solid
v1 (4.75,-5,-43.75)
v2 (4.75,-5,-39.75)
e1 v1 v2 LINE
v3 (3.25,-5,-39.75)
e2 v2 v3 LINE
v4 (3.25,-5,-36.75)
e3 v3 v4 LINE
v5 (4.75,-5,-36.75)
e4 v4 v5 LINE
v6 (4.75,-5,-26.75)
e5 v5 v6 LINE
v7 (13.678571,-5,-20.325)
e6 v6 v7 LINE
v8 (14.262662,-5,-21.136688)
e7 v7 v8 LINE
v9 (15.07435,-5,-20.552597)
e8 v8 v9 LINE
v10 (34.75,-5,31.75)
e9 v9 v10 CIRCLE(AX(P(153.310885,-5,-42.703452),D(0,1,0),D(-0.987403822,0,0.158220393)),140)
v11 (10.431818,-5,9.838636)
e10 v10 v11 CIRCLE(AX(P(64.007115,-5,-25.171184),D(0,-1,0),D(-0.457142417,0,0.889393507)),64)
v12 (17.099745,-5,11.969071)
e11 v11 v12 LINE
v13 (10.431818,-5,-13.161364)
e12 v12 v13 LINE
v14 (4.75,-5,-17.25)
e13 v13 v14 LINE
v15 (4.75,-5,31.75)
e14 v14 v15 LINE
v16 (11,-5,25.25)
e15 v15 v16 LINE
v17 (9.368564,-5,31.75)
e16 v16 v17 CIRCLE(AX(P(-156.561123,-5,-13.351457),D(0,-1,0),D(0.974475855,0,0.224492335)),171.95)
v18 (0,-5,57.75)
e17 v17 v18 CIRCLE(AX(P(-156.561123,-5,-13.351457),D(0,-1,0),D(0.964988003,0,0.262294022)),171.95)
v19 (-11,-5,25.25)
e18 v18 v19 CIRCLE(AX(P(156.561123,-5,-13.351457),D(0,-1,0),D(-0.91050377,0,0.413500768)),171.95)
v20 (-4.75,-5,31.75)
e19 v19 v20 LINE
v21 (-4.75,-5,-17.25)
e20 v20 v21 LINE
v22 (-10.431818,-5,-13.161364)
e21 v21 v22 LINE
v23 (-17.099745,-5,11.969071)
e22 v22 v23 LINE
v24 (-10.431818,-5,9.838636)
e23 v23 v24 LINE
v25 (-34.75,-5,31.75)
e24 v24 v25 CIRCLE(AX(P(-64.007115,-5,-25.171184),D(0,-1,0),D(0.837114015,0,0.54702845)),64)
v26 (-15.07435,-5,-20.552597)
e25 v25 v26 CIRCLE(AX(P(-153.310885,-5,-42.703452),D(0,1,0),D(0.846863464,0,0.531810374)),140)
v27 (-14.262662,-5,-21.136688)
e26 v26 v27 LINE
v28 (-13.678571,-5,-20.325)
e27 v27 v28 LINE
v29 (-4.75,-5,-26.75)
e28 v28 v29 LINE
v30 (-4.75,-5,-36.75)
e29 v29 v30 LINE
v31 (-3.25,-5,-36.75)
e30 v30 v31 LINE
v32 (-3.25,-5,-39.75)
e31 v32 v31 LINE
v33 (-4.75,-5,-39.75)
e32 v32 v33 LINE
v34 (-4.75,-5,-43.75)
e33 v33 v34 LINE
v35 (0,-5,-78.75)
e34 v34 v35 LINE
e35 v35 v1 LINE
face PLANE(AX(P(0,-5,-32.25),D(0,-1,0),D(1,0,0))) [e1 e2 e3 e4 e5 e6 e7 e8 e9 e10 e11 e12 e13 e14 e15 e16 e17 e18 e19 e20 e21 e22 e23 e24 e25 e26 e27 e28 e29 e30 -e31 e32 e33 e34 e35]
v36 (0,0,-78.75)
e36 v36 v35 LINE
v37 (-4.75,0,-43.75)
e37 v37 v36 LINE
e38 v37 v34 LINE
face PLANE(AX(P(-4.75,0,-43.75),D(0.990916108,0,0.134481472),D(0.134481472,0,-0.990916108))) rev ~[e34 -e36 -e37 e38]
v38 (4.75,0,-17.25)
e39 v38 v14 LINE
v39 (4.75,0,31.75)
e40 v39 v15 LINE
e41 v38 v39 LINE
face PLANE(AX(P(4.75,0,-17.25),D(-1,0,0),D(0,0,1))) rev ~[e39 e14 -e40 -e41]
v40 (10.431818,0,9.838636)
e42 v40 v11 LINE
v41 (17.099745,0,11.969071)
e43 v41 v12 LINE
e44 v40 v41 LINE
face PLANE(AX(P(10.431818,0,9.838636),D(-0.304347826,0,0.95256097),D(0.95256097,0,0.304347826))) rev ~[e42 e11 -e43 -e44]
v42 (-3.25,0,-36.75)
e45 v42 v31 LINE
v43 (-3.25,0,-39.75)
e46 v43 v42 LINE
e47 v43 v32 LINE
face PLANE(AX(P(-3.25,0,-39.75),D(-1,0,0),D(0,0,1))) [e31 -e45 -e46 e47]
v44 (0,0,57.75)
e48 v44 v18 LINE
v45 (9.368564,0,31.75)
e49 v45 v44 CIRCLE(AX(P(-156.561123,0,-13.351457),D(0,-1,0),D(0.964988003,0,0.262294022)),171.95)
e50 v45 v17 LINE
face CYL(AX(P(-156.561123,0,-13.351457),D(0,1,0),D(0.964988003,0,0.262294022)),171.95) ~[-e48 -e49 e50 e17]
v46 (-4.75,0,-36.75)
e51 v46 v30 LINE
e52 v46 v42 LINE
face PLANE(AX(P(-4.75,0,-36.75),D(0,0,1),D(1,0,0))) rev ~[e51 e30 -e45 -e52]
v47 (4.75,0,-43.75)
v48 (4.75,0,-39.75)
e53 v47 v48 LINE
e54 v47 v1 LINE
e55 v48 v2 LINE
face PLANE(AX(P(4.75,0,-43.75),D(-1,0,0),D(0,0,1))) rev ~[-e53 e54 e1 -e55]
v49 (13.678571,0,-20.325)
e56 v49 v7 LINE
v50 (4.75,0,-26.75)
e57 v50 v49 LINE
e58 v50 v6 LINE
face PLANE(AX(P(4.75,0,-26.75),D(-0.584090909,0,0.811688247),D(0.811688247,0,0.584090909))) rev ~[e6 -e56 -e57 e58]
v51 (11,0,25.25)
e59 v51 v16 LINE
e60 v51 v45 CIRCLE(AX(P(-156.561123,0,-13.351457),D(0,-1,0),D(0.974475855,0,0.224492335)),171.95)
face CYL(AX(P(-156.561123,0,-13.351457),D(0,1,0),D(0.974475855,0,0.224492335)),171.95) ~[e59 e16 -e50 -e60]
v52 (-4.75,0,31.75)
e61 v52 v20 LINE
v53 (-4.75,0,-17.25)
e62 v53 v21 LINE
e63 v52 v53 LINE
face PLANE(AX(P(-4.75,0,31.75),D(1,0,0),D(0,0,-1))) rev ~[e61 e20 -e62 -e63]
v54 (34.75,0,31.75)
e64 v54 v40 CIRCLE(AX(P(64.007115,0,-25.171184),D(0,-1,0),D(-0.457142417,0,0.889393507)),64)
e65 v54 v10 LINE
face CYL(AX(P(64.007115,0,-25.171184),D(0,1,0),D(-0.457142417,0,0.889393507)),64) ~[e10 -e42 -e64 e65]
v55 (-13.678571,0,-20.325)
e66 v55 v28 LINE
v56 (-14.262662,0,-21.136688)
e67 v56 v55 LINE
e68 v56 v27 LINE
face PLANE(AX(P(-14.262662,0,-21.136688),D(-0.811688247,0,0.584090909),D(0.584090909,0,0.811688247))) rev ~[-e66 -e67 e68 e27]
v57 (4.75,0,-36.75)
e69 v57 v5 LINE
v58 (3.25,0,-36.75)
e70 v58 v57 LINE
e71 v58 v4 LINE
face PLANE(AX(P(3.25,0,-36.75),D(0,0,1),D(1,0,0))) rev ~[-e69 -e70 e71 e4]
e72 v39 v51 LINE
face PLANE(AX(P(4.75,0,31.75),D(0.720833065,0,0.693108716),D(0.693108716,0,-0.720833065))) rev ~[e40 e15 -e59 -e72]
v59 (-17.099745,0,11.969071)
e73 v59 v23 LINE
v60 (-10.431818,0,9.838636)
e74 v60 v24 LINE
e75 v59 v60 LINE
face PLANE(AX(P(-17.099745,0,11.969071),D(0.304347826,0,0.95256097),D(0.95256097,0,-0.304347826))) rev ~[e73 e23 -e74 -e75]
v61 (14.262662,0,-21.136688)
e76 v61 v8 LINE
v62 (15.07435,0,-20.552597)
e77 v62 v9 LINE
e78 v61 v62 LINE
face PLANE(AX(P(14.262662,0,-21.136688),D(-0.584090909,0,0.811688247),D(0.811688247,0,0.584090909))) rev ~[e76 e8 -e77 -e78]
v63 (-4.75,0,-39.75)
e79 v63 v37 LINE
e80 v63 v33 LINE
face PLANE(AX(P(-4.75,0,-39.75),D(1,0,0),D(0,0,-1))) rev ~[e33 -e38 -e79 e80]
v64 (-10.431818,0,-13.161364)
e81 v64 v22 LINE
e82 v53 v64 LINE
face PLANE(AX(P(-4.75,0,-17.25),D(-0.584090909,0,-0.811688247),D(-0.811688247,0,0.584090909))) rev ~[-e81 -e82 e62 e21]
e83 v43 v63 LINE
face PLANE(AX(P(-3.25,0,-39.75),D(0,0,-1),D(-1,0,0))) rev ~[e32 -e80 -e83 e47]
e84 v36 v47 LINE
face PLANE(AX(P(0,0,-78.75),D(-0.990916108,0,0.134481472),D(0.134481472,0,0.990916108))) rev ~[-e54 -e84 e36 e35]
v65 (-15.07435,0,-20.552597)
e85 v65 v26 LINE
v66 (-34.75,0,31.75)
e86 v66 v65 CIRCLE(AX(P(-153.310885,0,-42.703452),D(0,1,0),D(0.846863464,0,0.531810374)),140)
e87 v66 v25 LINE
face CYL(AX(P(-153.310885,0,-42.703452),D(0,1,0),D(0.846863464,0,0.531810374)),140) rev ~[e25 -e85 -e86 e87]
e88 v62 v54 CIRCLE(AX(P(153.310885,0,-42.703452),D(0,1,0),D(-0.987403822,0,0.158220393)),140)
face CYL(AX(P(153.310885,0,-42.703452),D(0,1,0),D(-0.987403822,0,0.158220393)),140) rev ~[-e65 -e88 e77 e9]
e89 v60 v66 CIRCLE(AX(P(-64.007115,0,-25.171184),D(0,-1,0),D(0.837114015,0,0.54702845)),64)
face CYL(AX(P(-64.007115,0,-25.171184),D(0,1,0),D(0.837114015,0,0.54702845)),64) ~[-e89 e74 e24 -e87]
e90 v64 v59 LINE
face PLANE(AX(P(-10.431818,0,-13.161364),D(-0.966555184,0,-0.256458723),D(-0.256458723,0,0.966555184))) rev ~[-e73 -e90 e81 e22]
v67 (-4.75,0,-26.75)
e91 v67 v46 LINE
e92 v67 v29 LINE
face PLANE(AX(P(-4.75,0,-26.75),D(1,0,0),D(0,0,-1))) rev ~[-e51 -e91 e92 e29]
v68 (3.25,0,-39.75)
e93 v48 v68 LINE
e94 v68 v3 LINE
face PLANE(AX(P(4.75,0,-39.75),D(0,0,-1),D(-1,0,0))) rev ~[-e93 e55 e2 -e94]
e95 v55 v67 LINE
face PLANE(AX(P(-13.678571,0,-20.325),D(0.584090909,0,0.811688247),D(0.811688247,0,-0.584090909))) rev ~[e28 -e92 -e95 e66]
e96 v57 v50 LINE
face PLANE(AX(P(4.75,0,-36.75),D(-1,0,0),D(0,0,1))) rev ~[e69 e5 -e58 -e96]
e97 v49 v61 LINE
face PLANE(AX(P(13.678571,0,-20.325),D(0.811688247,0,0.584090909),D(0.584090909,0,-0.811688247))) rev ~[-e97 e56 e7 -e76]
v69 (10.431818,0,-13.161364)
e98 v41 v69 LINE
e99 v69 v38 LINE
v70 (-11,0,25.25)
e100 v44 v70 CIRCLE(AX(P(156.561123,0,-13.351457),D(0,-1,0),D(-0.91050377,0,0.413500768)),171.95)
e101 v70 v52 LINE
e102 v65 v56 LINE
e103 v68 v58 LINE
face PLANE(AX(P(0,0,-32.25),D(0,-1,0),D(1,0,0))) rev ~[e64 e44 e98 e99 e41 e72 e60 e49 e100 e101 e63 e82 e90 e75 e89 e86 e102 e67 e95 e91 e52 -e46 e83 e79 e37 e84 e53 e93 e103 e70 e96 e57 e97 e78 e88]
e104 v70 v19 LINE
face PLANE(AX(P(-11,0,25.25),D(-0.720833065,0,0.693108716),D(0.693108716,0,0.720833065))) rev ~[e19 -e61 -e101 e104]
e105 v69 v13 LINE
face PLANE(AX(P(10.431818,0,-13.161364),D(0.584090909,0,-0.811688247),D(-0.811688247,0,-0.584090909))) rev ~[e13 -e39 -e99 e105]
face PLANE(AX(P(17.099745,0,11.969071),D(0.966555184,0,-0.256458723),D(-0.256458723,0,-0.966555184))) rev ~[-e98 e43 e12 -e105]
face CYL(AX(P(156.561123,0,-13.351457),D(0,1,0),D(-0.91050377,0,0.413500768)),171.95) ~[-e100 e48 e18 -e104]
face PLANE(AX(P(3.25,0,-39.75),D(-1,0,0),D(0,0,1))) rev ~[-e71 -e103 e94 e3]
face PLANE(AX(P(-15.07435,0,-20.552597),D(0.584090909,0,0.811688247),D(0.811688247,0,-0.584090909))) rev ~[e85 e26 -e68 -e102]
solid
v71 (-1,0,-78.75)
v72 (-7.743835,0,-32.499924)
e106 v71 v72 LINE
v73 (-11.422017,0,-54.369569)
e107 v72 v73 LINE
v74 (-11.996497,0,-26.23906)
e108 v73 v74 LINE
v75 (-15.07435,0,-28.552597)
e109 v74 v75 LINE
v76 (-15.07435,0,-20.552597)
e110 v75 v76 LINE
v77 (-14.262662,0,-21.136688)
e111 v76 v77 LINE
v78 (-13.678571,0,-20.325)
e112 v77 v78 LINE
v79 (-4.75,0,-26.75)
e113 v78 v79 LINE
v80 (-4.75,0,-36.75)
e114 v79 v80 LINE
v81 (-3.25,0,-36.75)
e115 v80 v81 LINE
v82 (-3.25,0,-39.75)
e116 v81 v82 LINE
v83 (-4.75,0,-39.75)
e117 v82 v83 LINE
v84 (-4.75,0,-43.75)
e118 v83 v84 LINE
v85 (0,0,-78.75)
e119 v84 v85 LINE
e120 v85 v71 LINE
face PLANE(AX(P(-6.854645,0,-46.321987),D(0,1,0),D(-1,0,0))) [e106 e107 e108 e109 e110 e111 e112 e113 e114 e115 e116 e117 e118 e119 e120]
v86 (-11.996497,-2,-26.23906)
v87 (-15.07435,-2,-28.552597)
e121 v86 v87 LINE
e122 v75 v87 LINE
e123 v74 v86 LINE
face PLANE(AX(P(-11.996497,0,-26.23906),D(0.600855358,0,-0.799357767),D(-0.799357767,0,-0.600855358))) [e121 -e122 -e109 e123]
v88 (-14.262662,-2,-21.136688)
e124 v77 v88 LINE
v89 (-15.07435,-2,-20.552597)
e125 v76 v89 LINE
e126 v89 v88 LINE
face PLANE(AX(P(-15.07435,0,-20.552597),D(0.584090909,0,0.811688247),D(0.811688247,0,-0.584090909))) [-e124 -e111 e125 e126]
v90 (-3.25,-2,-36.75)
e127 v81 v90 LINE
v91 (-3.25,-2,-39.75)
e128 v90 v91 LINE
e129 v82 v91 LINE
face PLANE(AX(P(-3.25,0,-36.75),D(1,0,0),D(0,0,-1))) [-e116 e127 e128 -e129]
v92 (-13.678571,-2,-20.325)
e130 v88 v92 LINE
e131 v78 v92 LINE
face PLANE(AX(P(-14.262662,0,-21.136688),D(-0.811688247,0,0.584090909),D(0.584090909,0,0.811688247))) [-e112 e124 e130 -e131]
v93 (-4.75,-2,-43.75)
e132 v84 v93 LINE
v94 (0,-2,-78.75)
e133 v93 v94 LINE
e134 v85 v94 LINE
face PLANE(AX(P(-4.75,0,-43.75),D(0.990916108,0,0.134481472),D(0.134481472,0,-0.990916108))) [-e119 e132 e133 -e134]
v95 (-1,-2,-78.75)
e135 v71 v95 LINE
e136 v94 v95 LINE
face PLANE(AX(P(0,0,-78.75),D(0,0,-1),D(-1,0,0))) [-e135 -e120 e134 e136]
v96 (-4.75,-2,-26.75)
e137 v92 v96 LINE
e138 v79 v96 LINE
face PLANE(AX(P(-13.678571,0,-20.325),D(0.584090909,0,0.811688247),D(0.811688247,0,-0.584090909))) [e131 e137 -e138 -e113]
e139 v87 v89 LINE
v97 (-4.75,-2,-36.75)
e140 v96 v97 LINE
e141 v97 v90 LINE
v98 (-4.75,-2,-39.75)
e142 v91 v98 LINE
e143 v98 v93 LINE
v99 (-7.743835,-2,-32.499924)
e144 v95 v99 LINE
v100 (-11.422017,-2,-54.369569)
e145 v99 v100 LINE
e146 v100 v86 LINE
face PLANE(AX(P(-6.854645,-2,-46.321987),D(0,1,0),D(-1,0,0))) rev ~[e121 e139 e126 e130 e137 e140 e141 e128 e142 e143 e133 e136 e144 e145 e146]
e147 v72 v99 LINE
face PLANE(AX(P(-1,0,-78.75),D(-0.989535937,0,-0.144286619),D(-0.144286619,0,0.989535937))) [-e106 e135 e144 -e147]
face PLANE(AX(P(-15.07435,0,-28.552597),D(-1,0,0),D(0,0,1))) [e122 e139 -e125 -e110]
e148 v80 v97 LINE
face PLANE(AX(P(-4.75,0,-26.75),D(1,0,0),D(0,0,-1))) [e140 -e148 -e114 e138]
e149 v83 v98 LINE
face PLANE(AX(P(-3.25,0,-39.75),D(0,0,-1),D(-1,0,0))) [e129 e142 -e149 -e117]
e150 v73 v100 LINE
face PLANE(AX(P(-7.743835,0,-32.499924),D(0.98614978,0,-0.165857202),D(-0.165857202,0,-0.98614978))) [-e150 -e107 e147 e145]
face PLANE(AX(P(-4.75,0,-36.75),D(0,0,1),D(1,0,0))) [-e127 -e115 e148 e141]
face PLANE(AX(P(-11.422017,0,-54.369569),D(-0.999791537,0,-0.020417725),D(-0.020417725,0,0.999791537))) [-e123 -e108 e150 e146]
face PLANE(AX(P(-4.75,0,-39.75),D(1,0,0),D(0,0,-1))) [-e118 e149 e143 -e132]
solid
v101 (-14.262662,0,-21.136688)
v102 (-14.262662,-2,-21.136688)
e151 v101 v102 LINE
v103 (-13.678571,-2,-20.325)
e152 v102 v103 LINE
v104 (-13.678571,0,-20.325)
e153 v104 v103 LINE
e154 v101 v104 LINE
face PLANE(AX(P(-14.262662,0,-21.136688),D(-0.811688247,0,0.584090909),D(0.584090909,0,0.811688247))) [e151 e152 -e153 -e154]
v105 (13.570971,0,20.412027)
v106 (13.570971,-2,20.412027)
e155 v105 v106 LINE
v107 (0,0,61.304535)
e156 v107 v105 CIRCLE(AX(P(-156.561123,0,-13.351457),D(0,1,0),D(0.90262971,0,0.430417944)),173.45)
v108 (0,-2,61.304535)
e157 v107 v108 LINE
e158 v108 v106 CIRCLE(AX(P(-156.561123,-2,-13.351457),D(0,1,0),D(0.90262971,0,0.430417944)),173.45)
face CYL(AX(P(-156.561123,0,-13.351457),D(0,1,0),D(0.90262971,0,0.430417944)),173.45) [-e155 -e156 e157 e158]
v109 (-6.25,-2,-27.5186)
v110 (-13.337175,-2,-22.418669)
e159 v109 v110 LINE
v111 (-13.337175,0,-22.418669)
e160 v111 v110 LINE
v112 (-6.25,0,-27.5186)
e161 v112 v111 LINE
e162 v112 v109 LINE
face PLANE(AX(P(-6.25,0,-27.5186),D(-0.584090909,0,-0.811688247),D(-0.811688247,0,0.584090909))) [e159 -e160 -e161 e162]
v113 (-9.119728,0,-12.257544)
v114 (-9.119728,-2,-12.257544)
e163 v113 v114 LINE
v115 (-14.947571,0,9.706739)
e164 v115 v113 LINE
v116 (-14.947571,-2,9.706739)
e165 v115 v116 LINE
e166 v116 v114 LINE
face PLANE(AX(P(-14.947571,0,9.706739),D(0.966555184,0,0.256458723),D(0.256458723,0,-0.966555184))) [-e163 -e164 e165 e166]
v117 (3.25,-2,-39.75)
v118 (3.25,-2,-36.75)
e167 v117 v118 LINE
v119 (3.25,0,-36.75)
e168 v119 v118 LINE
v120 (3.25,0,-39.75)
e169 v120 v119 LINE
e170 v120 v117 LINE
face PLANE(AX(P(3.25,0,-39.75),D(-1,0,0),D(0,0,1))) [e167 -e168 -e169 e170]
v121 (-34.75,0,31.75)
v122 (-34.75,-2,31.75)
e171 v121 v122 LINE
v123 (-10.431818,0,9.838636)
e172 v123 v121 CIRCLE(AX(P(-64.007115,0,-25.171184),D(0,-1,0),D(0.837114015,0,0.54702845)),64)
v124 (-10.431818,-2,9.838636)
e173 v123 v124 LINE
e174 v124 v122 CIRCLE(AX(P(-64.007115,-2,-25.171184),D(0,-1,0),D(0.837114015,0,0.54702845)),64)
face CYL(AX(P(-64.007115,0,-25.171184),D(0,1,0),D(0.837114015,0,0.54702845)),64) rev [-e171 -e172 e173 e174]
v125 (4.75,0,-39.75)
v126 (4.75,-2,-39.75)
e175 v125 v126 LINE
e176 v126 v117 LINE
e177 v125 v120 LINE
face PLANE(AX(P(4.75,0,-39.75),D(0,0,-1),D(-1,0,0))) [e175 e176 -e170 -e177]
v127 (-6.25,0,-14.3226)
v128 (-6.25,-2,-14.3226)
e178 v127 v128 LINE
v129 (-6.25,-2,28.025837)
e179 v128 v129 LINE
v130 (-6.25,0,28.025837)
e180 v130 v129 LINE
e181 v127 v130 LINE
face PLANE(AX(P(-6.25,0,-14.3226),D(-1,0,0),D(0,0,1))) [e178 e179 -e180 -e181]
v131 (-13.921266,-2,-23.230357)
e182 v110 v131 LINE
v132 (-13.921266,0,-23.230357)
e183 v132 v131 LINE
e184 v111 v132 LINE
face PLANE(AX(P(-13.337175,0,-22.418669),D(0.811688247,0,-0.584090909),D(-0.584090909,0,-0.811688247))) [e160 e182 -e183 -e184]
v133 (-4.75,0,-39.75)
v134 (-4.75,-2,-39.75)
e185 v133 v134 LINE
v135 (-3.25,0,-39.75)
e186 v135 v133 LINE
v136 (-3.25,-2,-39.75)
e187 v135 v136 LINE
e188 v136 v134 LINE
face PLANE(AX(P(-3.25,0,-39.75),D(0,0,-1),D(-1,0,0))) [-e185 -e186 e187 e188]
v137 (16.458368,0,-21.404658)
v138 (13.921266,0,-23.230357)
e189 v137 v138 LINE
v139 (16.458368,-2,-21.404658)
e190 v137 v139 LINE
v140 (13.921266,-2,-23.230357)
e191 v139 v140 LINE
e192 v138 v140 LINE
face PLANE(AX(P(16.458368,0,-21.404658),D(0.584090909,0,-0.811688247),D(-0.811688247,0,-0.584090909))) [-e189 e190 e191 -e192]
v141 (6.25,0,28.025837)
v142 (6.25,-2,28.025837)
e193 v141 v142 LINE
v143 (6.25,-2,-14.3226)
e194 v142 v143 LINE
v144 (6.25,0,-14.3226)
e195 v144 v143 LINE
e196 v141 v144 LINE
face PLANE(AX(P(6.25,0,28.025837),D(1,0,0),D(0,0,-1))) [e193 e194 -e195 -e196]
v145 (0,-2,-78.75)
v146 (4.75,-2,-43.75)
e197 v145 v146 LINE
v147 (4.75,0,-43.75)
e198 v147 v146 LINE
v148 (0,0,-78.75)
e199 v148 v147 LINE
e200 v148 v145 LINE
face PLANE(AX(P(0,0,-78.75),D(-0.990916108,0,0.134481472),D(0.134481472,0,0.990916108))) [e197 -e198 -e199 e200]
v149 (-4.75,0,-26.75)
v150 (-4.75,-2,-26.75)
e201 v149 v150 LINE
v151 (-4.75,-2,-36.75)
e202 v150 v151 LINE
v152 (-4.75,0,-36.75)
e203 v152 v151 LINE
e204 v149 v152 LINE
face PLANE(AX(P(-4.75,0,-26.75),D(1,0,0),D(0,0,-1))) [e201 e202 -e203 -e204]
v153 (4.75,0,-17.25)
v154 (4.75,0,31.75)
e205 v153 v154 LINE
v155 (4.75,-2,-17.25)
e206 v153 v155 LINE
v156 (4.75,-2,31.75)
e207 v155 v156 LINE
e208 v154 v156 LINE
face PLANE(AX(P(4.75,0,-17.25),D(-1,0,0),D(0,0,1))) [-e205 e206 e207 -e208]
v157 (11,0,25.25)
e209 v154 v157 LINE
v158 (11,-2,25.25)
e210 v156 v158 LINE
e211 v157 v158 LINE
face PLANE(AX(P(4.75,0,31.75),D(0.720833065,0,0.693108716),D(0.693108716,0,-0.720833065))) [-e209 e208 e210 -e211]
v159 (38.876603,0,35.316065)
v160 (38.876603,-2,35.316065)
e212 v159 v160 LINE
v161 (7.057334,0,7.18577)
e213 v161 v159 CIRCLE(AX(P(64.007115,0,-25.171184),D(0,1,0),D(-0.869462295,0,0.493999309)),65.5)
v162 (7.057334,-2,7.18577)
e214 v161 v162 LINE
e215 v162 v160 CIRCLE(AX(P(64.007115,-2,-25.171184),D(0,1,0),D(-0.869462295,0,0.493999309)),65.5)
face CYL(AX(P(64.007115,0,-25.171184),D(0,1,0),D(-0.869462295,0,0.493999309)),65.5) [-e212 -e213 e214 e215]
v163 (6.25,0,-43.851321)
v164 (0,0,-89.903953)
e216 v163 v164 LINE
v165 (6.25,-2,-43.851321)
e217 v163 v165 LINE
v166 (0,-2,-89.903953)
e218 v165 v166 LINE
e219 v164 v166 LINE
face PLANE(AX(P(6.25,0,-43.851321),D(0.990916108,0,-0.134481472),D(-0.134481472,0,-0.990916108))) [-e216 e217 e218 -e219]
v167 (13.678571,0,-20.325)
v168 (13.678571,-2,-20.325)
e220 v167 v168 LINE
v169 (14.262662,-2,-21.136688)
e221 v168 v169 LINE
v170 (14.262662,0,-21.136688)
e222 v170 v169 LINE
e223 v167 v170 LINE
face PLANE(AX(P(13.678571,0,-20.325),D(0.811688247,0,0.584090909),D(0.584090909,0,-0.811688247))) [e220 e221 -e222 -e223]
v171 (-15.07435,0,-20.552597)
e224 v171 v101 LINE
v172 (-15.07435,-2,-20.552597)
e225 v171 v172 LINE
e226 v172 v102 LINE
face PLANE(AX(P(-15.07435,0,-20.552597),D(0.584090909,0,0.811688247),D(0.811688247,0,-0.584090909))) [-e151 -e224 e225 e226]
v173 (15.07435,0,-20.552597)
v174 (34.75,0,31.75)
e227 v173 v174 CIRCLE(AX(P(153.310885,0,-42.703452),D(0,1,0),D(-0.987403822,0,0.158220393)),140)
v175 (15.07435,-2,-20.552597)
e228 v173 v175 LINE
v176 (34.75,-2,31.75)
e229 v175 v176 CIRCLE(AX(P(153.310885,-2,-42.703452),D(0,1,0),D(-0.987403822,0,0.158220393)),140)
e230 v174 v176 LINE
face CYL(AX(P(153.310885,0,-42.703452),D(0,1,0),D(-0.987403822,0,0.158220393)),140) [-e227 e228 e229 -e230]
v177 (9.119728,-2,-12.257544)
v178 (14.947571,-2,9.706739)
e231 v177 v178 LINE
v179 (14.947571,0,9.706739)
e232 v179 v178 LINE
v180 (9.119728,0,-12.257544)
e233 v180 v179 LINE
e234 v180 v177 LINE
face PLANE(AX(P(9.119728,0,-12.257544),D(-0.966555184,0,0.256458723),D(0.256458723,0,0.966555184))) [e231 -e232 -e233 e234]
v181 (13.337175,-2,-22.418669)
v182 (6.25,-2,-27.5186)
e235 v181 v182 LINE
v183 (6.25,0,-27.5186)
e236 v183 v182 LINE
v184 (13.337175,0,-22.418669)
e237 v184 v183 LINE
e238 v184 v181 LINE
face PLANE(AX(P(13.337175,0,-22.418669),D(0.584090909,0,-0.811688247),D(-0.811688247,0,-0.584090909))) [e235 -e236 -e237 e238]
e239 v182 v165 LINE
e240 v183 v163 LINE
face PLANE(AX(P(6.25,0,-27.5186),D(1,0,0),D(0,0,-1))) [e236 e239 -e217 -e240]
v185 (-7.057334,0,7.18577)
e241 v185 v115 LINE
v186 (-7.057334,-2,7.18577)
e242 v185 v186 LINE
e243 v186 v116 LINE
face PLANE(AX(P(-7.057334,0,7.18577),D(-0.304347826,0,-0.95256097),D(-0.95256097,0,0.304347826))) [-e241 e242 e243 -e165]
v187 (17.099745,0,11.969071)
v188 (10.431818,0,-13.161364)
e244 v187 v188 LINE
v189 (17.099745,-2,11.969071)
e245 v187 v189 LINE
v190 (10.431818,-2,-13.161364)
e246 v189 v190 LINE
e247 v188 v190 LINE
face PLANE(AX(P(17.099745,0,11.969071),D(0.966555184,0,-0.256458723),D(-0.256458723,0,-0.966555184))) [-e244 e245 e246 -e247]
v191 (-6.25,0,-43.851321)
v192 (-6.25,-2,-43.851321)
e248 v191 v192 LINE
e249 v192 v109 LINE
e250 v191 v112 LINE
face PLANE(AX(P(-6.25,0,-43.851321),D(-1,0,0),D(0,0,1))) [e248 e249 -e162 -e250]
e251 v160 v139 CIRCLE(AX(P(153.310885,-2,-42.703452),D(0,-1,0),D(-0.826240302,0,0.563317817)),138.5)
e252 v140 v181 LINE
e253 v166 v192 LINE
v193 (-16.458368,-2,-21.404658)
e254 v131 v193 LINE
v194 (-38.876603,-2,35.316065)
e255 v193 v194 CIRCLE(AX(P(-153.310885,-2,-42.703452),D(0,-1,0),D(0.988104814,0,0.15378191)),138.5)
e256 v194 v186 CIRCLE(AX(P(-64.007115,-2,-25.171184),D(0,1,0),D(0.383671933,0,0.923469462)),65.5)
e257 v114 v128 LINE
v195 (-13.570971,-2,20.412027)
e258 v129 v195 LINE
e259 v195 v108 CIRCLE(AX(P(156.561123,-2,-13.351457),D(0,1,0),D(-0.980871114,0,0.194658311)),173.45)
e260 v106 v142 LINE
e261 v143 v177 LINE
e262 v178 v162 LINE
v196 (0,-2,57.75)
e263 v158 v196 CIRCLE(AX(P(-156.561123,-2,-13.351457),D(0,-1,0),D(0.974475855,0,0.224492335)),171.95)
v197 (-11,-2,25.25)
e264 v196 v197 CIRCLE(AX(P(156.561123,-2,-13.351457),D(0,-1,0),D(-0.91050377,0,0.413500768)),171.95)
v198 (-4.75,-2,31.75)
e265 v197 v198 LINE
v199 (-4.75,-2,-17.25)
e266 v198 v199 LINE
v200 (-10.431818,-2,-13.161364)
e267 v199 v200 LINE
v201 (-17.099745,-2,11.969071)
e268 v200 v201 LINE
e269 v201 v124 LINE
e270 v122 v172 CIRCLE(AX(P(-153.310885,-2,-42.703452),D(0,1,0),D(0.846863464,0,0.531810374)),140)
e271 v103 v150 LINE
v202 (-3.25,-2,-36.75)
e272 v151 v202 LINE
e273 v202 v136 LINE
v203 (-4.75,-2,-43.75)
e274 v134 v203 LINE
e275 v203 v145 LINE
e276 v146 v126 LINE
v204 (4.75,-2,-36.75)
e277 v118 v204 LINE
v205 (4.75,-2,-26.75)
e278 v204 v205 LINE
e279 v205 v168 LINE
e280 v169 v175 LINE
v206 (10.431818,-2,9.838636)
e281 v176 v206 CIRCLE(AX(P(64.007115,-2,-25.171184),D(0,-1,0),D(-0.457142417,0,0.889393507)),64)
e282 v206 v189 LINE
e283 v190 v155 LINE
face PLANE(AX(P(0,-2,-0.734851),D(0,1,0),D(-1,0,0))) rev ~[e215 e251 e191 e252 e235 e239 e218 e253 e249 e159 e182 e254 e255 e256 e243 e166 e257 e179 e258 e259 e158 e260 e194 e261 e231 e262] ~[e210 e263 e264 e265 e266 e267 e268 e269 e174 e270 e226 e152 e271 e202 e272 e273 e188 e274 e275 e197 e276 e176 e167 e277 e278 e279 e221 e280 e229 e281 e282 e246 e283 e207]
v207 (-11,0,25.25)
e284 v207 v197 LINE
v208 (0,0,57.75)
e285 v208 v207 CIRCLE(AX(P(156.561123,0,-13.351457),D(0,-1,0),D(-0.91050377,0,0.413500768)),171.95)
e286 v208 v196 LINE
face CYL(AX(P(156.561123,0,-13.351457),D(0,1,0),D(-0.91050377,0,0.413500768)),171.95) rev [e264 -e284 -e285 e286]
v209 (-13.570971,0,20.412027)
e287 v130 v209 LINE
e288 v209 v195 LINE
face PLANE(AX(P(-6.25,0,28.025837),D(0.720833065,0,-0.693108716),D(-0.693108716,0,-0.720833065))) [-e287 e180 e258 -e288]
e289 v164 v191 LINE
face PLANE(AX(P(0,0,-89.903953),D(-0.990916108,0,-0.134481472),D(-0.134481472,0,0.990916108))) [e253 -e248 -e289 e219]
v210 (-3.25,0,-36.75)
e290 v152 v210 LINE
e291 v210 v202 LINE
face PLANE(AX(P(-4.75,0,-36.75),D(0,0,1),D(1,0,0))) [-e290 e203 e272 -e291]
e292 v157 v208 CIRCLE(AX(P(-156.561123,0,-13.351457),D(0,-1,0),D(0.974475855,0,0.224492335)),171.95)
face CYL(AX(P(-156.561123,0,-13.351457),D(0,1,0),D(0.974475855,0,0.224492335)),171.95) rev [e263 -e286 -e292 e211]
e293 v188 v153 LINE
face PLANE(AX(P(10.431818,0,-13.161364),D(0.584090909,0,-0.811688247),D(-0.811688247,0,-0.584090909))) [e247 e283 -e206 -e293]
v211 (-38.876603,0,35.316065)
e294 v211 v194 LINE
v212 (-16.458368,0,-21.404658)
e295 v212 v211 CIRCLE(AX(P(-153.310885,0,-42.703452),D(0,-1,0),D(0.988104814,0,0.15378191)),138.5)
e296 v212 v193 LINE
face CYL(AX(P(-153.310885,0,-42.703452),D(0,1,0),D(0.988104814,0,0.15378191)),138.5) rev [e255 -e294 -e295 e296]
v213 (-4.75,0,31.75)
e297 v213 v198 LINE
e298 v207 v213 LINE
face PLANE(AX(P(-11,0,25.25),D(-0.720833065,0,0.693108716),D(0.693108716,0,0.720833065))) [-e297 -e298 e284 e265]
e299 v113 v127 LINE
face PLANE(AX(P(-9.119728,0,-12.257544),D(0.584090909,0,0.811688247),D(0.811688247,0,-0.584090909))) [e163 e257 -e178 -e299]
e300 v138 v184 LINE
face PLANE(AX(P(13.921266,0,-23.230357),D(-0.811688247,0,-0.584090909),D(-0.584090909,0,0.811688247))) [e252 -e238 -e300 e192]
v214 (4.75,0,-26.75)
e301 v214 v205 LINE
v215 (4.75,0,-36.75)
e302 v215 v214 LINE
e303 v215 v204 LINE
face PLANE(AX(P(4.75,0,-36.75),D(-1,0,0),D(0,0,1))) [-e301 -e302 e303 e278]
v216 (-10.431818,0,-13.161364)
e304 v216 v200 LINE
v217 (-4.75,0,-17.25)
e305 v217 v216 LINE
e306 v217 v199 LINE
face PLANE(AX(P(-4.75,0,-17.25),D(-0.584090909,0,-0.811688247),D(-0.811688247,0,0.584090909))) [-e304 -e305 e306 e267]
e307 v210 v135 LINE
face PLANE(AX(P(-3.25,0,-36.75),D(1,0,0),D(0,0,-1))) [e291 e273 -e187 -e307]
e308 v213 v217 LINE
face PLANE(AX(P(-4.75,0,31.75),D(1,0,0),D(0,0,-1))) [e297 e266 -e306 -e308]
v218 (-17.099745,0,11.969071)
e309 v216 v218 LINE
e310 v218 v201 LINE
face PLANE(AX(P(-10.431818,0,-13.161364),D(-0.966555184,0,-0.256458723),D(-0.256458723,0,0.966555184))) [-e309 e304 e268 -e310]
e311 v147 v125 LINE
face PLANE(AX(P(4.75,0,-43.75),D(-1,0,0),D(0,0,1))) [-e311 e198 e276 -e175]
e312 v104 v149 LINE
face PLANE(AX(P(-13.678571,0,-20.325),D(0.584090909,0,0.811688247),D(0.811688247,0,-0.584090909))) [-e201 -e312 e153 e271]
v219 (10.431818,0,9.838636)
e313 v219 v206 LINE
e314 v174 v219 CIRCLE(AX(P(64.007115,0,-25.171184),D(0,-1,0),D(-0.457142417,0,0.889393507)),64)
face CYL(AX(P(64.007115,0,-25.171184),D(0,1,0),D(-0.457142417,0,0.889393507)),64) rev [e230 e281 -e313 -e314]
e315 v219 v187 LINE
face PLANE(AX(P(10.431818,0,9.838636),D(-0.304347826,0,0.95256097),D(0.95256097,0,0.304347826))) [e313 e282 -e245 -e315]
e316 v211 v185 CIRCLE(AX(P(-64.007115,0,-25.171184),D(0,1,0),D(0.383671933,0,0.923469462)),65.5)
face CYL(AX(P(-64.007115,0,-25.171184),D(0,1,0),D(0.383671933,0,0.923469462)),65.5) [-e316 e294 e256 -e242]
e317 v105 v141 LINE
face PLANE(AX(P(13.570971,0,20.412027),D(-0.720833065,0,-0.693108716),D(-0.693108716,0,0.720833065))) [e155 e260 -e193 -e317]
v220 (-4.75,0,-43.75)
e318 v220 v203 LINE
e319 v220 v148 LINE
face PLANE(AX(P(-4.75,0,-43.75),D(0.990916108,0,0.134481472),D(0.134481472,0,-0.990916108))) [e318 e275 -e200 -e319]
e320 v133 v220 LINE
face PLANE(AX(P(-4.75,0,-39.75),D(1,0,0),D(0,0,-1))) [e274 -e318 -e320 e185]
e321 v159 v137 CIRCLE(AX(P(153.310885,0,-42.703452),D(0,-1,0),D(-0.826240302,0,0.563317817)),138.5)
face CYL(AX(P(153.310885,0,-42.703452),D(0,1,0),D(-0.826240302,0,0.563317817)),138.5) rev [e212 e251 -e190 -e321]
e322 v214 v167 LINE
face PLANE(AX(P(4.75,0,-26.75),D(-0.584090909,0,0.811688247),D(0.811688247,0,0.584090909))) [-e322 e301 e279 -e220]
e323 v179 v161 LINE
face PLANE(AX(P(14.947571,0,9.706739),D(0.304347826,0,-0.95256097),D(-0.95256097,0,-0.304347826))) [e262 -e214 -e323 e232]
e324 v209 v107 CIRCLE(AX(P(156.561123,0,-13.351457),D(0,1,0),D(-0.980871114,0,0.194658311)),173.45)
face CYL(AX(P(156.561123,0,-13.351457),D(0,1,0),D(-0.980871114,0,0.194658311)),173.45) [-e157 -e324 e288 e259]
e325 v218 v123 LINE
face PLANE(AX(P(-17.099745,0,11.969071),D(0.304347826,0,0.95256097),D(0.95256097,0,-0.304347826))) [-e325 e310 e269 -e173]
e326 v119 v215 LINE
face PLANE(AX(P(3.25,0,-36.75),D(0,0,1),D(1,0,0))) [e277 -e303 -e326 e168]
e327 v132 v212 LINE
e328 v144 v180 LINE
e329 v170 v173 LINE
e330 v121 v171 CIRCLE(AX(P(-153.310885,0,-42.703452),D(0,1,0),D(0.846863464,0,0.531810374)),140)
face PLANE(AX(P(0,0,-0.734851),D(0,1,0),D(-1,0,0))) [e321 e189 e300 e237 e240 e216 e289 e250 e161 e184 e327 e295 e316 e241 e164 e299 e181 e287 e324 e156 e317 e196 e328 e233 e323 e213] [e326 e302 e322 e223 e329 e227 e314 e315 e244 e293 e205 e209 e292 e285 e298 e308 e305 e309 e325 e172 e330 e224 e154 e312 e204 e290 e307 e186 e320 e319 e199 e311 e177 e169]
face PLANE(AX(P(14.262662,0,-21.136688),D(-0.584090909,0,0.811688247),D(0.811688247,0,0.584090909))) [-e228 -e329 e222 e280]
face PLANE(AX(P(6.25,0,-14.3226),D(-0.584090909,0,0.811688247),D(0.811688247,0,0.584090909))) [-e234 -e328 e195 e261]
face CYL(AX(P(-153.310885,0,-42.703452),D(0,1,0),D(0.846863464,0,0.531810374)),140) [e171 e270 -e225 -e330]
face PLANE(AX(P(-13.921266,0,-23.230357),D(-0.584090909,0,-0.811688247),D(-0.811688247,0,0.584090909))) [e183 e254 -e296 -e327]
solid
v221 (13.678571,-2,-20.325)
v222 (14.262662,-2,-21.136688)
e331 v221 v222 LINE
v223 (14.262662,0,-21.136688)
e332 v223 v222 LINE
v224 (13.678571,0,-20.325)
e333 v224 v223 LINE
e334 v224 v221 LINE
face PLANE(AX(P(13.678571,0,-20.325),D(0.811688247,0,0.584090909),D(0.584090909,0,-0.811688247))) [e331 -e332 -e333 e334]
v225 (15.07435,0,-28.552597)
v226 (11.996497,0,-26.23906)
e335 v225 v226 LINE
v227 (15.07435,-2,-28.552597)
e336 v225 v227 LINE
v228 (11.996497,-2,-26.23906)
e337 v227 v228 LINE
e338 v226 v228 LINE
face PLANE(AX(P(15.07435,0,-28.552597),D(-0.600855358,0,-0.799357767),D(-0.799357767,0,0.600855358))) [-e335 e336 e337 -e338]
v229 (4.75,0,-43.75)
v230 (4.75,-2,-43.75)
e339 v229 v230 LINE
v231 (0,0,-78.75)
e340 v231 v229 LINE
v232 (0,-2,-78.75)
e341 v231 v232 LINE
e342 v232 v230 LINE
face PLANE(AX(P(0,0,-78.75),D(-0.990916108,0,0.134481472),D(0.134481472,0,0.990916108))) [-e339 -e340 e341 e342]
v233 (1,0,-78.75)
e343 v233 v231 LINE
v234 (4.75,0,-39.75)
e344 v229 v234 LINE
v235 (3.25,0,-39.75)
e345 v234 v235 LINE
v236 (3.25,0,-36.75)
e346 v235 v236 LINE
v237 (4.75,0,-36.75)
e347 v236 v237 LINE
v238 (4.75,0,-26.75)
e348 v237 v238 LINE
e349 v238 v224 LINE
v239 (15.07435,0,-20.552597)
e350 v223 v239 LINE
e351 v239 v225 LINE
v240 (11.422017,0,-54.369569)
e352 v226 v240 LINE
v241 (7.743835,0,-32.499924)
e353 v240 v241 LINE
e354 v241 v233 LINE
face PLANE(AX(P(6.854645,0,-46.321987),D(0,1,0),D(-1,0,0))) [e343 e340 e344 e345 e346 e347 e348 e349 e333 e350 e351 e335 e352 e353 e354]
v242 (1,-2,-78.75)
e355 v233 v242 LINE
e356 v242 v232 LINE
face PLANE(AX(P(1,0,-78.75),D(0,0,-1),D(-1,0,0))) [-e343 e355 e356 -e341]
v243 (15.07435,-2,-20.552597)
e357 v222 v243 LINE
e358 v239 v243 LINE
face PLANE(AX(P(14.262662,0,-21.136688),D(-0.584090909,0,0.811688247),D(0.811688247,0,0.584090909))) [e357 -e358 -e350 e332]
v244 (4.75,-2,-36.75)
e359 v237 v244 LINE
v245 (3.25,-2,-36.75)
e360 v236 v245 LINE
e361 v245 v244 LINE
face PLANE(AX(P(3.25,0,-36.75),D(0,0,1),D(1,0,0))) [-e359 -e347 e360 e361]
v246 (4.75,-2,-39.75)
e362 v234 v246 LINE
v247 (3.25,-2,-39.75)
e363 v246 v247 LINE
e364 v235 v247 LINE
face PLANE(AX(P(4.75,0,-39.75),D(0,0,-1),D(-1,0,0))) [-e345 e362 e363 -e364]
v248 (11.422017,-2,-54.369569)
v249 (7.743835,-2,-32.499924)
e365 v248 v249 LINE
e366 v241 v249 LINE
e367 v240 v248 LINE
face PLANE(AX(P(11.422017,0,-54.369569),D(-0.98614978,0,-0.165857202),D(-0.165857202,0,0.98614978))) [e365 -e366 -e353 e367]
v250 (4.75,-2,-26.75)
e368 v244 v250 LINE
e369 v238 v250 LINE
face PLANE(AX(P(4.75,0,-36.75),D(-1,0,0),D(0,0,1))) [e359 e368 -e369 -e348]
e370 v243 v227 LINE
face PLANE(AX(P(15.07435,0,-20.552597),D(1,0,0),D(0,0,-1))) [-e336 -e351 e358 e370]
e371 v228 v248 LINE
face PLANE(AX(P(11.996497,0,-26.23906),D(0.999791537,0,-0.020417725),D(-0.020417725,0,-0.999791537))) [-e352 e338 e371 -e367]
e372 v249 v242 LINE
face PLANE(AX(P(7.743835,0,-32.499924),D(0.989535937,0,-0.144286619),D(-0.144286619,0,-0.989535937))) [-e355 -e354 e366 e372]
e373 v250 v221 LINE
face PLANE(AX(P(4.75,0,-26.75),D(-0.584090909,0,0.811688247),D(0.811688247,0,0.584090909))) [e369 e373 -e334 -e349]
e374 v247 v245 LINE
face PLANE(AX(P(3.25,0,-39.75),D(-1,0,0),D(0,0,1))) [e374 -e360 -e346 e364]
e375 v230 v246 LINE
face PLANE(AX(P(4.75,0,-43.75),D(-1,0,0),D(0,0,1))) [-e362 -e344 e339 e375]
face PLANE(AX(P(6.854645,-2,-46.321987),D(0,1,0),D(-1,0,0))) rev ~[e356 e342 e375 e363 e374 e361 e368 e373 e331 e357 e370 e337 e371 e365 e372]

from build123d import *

# Parameters (mm, degrees)
F0_W     = 9.5
F0_H     = 3
F0_W_2   = 4.75
F0_H_2   = 6.5
F0_W_3   = 6.5
F1_DEPTH = 5
F3_DEPTH = 2
F5_DEPTH = 2


with BuildPart() as f1:
    # F0 (on Front) → F1 (new body)
    with BuildSketch(Plane.XZ):
        Polygon((4.75, -32.75), (4.75, -31.75), (0, -31.75), (-4.75, -31.75), (-4.75, -32.75), align=None)
        Polygon((0, -31.75), (4.75, -31.75), (4.75, -26.75), (4.75, -17.25), (4.75, 25.25), (0, 25.25), (-4.75, 25.25), (-4.75, -17.25), (-4.75, -26.75), (-4.75, -31.75), align=None)
        with BuildLine():
            Line((4.75, -17.25), (4.75, -26.75))
            Line((4.75, -26.75), (13.6785707143, -20.325))
            Line((13.6785707143, -20.325), (14.2626616234, -21.1366882468))
            Line((14.2626616234, -21.1366882468), (15.0743498701, -20.5525973377))
            ThreePointArc((15.0743498701, -20.5525973377), (22.2760836347, 6.5903692937), (34.75, 31.75))
            ThreePointArc((34.75, 31.75), (21.1663739273, 22.3753288761), (10.4318177273, 9.8386363636))
            Line((10.4318177273, 9.8386363636), (17.0997445143, 11.9690711462))
            Line((17.0997445143, 11.9690711462), (10.4318177273, -13.1613636364))
            Line((10.4318177273, -13.1613636364), (4.75, -17.25))
        make_face()
        with Locations((0, -34.25)):
            Rectangle(F0_W, F0_H)
        Polygon((4.75, -36.75), (4.75, -35.75), (-4.75, -35.75), (-4.75, -36.75), (-3.25, -36.75), (3.25, -36.75), align=None)
        with BuildLine():
            Line((-13.6785707143, -20.325), (-4.75, -26.75))
            Line((-4.75, -26.75), (-4.75, -17.25))
            Line((-4.75, -17.25), (-10.4318177273, -13.1613636364))
            Line((-10.4318177273, -13.1613636364), (-17.0997445143, 11.9690711462))
            Line((-17.0997445143, 11.9690711462), (-10.4318177273, 9.8386363636))
            ThreePointArc((-10.4318177273, 9.8386363636), (-21.1663739273, 22.3753288761), (-34.75, 31.75))
            ThreePointArc((-34.75, 31.75), (-22.2760836347, 6.5903692937), (-15.0743498701, -20.5525973377))
            Line((-15.0743498701, -20.5525973377), (-14.2626616234, -21.1366882468))
            Line((-14.2626616234, -21.1366882468), (-13.6785707143, -20.325))
        make_face()
        with Locations((2.375, 28.5)):
            Rectangle(F0_W_2, F0_H_2)
        Polygon((8.8, 31.75), (4.75, 31.75), (11, 25.25), align=None)
        Polygon((0, 31.75), (4.75, 31.75), (8.8, 31.75), (0, 57.75), align=None)
        with Locations((-2.375, 28.5)):
            Rectangle(F0_W_2, F0_H_2)
        with BuildLine():
            Line((8.8, 31.75), (11, 25.25))
            ThreePointArc((11, 25.25), (10.2159514871, 28.5079487405), (9.3685639152, 31.75))
            Line((9.3685639152, 31.75), (8.8, 31.75))
        make_face()
        with Locations((0, -38.25)):
            Rectangle(F0_W_3, F0_H)
        Polygon((-4.75, 31.75), (0, 31.75), (0, 57.75), (-11, 25.25), align=None)
        with BuildLine():
            Line((0, 57.75), (8.8, 31.75))
            Line((8.8, 31.75), (9.3685639152, 31.75))
            ThreePointArc((9.3685639152, 31.75), (5.207479083, 44.9385232965), (0, 57.75))
        make_face()
        Polygon((4.75, -39.75), (3.25, -39.75), (-3.25, -39.75), (-4.75, -39.75), (-4.75, -40.75), (4.75, -40.75), align=None)
        with BuildLine():
            ThreePointArc((0, 57.75), (-6.3126627605, 41.7750550882), (-11, 25.25))
            Line((-11, 25.25), (0, 57.75))
        make_face()
        Polygon((4.75, -43.75), (4.75, -40.75), (-4.75, -40.75), (-4.75, -43.75), (0, -43.75), align=None)
        Polygon((0, -78.75), (4.75, -43.75), (0, -43.75), align=None)
        Polygon((0, -43.75), (-4.75, -43.75), (0, -78.75), align=None)
    extrude(amount=F1_DEPTH)


with BuildPart() as f3:
    # F2 (on face) → F3 (new body)
    with BuildSketch(Plane(origin=(0, 0, 0), x_dir=(-1, 0, 0), z_dir=(0, 1, 0))):
        Polygon((15.0743498701, -28.5525973377), (15.0743498701, -20.5525973377), (14.2626616234, -21.1366882468), (13.6785707143, -20.325), (4.75, -26.75), (4.75, -36.75), (3.25, -36.75), (3.25, -39.75), (4.75, -39.75), (4.75, -43.75), (0, -78.75), (1, -78.75), (7.7438349836, -32.4999243021), (11.4220166579, -54.3695688248), (11.9964974001, -26.2390598655), align=None)
    extrude(amount=-F3_DEPTH)


with BuildPart() as f3b:
    # F2 (on face) → F3, piece 2 (new body)
    with BuildSketch(Plane(origin=(0, 0, 0), x_dir=(-1, 0, 0), z_dir=(0, 1, 0))):
        Polygon((-1, -78.75), (0, -78.75), (-4.75, -43.75), (-4.75, -39.75), (-3.25, -39.75), (-3.25, -36.75), (-4.75, -36.75), (-4.75, -26.75), (-13.6785707143, -20.325), (-14.2626616234, -21.1366882468), (-15.0743498701, -20.5525973377), (-15.0743498701, -28.5525973377), (-11.9964974001, -26.2390598655), (-11.4220166579, -54.3695688248), (-7.7438349836, -32.4999243021), align=None)
    extrude(amount=-F3_DEPTH)


with BuildPart() as f5:
    # F4 (on face) → F5 (new body)
    with BuildSketch(Plane(origin=(0, 0, 0), x_dir=(-1, 0, 0), z_dir=(0, 1, 0))):
        with BuildLine():
            Line((9.1197276527, -12.2575435817), (6.25, -14.3225997658))
            Line((6.25, -14.3225997658), (6.25, 28.0258373444))
            Line((6.25, 28.0258373444), (13.5709714754, 20.4120270099))
            ThreePointArc((13.5709714754, 20.4120270099), (8.0601511253, 41.2813035717), (0, 61.3045353033))
            ThreePointArc((0, 61.3045353033), (-8.0601511253, 41.2813035717), (-13.5709714754, 20.4120270099))
            Line((-13.5709714754, 20.4120270099), (-6.25, 28.0258373444))
            Line((-6.25, 28.0258373444), (-6.25, -14.3225997658))
            Line((-6.25, -14.3225997658), (-9.1197276527, -12.2575435817))
            Line((-9.1197276527, -12.2575435817), (-14.9475706012, 9.7067388435))
            Line((-14.9475706012, 9.7067388435), (-7.0573343808, 7.185770299))
            ThreePointArc((-7.0573343808, 7.185770299), (-20.623685191, 23.9014967836), (-38.8766030738, 35.3160653244))
            ThreePointArc((-38.8766030738, 35.3160653244), (-24.5064831966, 8.2050547659), (-16.4583681212, -21.4046578724))
            Line((-16.4583681212, -21.4046578724), (-13.9212656169, -23.2303569805))
            Line((-13.9212656169, -23.2303569805), (-13.3371747078, -22.4186687338))
            Line((-13.3371747078, -22.4186687338), (-6.25, -27.5186000615))
            Line((-6.25, -27.5186000615), (-6.25, -38.25))
            Line((-6.25, -38.25), (-6.25, -43.8513212997))
            Line((-6.25, -43.8513212997), (0, -89.9039528787))
            Line((0, -89.9039528787), (6.25, -43.8513212997))
            Line((6.25, -43.8513212997), (6.25, -38.25))
            Line((6.25, -38.25), (6.25, -27.5186000615))
            Line((6.25, -27.5186000615), (13.3371747078, -22.4186687338))
            Line((13.3371747078, -22.4186687338), (13.9212656169, -23.2303569805))
            Line((13.9212656169, -23.2303569805), (16.4583681212, -21.4046578724))
            ThreePointArc((16.4583681212, -21.4046578724), (24.5064831966, 8.2050547659), (38.8766030738, 35.3160653244))
            ThreePointArc((38.8766030738, 35.3160653244), (20.623685191, 23.9014967836), (7.0573343808, 7.185770299))
            Line((7.0573343808, 7.185770299), (14.9475706012, 9.7067388435))
            Line((14.9475706012, 9.7067388435), (9.1197276527, -12.2575435817))
        make_face()
        with BuildLine():
            Line((-4.75, -26.75), (-13.6785707143, -20.325))
            Line((-13.6785707143, -20.325), (-14.2626616234, -21.1366882468))
            Line((-14.2626616234, -21.1366882468), (-15.0743498701, -20.5525973377))
            ThreePointArc((-15.0743498701, -20.5525973377), (-22.2760836347, 6.5903692937), (-34.75, 31.75))
            ThreePointArc((-34.75, 31.75), (-21.1663739273, 22.3753288761), (-10.4318177273, 9.8386363636))
            Line((-10.4318177273, 9.8386363636), (-17.0997445143, 11.9690711462))
            Line((-17.0997445143, 11.9690711462), (-10.4318177273, -13.1613636364))
            Line((-10.4318177273, -13.1613636364), (-4.75, -17.25))
            Line((-4.75, -17.25), (-4.75, 31.75))
            Line((-4.75, 31.75), (-11, 25.25))
            ThreePointArc((-11, 25.25), (-6.3126627605, 41.7750550882), (0, 57.75))
            ThreePointArc((0, 57.75), (6.3126627605, 41.7750550882), (11, 25.25))
            Line((11, 25.25), (4.75, 31.75))
            Line((4.75, 31.75), (4.75, -17.25))
            Line((4.75, -17.25), (10.4318177273, -13.1613636364))
            Line((10.4318177273, -13.1613636364), (17.0997445143, 11.9690711462))
            Line((17.0997445143, 11.9690711462), (10.4318177273, 9.8386363636))
            ThreePointArc((10.4318177273, 9.8386363636), (21.1663739273, 22.3753288761), (34.75, 31.75))
            ThreePointArc((34.75, 31.75), (22.2760836347, 6.5903692937), (15.0743498701, -20.5525973377))
            Line((15.0743498701, -20.5525973377), (14.2626616234, -21.1366882468))
            Line((14.2626616234, -21.1366882468), (13.6785707143, -20.325))
            Line((13.6785707143, -20.325), (4.75, -26.75))
            Line((4.75, -26.75), (4.75, -36.75))
            Line((4.75, -36.75), (3.25, -36.75))
            Line((3.25, -36.75), (3.25, -39.75))
            Line((3.25, -39.75), (4.75, -39.75))
            Line((4.75, -39.75), (4.75, -43.75))
            Line((4.75, -43.75), (0, -78.75))
            Line((0, -78.75), (-4.75, -43.75))
            Line((-4.75, -43.75), (-4.75, -39.75))
            Line((-4.75, -39.75), (-3.25, -39.75))
            Line((-3.25, -39.75), (-3.25, -36.75))
            Line((-3.25, -36.75), (-4.75, -36.75))
            Line((-4.75, -36.75), (-4.75, -26.75))
        make_face(mode=Mode.SUBTRACT)
    extrude(amount=-F5_DEPTH)


solid = Compound([f1.part, f3.part, f3b.part, f5.part])
